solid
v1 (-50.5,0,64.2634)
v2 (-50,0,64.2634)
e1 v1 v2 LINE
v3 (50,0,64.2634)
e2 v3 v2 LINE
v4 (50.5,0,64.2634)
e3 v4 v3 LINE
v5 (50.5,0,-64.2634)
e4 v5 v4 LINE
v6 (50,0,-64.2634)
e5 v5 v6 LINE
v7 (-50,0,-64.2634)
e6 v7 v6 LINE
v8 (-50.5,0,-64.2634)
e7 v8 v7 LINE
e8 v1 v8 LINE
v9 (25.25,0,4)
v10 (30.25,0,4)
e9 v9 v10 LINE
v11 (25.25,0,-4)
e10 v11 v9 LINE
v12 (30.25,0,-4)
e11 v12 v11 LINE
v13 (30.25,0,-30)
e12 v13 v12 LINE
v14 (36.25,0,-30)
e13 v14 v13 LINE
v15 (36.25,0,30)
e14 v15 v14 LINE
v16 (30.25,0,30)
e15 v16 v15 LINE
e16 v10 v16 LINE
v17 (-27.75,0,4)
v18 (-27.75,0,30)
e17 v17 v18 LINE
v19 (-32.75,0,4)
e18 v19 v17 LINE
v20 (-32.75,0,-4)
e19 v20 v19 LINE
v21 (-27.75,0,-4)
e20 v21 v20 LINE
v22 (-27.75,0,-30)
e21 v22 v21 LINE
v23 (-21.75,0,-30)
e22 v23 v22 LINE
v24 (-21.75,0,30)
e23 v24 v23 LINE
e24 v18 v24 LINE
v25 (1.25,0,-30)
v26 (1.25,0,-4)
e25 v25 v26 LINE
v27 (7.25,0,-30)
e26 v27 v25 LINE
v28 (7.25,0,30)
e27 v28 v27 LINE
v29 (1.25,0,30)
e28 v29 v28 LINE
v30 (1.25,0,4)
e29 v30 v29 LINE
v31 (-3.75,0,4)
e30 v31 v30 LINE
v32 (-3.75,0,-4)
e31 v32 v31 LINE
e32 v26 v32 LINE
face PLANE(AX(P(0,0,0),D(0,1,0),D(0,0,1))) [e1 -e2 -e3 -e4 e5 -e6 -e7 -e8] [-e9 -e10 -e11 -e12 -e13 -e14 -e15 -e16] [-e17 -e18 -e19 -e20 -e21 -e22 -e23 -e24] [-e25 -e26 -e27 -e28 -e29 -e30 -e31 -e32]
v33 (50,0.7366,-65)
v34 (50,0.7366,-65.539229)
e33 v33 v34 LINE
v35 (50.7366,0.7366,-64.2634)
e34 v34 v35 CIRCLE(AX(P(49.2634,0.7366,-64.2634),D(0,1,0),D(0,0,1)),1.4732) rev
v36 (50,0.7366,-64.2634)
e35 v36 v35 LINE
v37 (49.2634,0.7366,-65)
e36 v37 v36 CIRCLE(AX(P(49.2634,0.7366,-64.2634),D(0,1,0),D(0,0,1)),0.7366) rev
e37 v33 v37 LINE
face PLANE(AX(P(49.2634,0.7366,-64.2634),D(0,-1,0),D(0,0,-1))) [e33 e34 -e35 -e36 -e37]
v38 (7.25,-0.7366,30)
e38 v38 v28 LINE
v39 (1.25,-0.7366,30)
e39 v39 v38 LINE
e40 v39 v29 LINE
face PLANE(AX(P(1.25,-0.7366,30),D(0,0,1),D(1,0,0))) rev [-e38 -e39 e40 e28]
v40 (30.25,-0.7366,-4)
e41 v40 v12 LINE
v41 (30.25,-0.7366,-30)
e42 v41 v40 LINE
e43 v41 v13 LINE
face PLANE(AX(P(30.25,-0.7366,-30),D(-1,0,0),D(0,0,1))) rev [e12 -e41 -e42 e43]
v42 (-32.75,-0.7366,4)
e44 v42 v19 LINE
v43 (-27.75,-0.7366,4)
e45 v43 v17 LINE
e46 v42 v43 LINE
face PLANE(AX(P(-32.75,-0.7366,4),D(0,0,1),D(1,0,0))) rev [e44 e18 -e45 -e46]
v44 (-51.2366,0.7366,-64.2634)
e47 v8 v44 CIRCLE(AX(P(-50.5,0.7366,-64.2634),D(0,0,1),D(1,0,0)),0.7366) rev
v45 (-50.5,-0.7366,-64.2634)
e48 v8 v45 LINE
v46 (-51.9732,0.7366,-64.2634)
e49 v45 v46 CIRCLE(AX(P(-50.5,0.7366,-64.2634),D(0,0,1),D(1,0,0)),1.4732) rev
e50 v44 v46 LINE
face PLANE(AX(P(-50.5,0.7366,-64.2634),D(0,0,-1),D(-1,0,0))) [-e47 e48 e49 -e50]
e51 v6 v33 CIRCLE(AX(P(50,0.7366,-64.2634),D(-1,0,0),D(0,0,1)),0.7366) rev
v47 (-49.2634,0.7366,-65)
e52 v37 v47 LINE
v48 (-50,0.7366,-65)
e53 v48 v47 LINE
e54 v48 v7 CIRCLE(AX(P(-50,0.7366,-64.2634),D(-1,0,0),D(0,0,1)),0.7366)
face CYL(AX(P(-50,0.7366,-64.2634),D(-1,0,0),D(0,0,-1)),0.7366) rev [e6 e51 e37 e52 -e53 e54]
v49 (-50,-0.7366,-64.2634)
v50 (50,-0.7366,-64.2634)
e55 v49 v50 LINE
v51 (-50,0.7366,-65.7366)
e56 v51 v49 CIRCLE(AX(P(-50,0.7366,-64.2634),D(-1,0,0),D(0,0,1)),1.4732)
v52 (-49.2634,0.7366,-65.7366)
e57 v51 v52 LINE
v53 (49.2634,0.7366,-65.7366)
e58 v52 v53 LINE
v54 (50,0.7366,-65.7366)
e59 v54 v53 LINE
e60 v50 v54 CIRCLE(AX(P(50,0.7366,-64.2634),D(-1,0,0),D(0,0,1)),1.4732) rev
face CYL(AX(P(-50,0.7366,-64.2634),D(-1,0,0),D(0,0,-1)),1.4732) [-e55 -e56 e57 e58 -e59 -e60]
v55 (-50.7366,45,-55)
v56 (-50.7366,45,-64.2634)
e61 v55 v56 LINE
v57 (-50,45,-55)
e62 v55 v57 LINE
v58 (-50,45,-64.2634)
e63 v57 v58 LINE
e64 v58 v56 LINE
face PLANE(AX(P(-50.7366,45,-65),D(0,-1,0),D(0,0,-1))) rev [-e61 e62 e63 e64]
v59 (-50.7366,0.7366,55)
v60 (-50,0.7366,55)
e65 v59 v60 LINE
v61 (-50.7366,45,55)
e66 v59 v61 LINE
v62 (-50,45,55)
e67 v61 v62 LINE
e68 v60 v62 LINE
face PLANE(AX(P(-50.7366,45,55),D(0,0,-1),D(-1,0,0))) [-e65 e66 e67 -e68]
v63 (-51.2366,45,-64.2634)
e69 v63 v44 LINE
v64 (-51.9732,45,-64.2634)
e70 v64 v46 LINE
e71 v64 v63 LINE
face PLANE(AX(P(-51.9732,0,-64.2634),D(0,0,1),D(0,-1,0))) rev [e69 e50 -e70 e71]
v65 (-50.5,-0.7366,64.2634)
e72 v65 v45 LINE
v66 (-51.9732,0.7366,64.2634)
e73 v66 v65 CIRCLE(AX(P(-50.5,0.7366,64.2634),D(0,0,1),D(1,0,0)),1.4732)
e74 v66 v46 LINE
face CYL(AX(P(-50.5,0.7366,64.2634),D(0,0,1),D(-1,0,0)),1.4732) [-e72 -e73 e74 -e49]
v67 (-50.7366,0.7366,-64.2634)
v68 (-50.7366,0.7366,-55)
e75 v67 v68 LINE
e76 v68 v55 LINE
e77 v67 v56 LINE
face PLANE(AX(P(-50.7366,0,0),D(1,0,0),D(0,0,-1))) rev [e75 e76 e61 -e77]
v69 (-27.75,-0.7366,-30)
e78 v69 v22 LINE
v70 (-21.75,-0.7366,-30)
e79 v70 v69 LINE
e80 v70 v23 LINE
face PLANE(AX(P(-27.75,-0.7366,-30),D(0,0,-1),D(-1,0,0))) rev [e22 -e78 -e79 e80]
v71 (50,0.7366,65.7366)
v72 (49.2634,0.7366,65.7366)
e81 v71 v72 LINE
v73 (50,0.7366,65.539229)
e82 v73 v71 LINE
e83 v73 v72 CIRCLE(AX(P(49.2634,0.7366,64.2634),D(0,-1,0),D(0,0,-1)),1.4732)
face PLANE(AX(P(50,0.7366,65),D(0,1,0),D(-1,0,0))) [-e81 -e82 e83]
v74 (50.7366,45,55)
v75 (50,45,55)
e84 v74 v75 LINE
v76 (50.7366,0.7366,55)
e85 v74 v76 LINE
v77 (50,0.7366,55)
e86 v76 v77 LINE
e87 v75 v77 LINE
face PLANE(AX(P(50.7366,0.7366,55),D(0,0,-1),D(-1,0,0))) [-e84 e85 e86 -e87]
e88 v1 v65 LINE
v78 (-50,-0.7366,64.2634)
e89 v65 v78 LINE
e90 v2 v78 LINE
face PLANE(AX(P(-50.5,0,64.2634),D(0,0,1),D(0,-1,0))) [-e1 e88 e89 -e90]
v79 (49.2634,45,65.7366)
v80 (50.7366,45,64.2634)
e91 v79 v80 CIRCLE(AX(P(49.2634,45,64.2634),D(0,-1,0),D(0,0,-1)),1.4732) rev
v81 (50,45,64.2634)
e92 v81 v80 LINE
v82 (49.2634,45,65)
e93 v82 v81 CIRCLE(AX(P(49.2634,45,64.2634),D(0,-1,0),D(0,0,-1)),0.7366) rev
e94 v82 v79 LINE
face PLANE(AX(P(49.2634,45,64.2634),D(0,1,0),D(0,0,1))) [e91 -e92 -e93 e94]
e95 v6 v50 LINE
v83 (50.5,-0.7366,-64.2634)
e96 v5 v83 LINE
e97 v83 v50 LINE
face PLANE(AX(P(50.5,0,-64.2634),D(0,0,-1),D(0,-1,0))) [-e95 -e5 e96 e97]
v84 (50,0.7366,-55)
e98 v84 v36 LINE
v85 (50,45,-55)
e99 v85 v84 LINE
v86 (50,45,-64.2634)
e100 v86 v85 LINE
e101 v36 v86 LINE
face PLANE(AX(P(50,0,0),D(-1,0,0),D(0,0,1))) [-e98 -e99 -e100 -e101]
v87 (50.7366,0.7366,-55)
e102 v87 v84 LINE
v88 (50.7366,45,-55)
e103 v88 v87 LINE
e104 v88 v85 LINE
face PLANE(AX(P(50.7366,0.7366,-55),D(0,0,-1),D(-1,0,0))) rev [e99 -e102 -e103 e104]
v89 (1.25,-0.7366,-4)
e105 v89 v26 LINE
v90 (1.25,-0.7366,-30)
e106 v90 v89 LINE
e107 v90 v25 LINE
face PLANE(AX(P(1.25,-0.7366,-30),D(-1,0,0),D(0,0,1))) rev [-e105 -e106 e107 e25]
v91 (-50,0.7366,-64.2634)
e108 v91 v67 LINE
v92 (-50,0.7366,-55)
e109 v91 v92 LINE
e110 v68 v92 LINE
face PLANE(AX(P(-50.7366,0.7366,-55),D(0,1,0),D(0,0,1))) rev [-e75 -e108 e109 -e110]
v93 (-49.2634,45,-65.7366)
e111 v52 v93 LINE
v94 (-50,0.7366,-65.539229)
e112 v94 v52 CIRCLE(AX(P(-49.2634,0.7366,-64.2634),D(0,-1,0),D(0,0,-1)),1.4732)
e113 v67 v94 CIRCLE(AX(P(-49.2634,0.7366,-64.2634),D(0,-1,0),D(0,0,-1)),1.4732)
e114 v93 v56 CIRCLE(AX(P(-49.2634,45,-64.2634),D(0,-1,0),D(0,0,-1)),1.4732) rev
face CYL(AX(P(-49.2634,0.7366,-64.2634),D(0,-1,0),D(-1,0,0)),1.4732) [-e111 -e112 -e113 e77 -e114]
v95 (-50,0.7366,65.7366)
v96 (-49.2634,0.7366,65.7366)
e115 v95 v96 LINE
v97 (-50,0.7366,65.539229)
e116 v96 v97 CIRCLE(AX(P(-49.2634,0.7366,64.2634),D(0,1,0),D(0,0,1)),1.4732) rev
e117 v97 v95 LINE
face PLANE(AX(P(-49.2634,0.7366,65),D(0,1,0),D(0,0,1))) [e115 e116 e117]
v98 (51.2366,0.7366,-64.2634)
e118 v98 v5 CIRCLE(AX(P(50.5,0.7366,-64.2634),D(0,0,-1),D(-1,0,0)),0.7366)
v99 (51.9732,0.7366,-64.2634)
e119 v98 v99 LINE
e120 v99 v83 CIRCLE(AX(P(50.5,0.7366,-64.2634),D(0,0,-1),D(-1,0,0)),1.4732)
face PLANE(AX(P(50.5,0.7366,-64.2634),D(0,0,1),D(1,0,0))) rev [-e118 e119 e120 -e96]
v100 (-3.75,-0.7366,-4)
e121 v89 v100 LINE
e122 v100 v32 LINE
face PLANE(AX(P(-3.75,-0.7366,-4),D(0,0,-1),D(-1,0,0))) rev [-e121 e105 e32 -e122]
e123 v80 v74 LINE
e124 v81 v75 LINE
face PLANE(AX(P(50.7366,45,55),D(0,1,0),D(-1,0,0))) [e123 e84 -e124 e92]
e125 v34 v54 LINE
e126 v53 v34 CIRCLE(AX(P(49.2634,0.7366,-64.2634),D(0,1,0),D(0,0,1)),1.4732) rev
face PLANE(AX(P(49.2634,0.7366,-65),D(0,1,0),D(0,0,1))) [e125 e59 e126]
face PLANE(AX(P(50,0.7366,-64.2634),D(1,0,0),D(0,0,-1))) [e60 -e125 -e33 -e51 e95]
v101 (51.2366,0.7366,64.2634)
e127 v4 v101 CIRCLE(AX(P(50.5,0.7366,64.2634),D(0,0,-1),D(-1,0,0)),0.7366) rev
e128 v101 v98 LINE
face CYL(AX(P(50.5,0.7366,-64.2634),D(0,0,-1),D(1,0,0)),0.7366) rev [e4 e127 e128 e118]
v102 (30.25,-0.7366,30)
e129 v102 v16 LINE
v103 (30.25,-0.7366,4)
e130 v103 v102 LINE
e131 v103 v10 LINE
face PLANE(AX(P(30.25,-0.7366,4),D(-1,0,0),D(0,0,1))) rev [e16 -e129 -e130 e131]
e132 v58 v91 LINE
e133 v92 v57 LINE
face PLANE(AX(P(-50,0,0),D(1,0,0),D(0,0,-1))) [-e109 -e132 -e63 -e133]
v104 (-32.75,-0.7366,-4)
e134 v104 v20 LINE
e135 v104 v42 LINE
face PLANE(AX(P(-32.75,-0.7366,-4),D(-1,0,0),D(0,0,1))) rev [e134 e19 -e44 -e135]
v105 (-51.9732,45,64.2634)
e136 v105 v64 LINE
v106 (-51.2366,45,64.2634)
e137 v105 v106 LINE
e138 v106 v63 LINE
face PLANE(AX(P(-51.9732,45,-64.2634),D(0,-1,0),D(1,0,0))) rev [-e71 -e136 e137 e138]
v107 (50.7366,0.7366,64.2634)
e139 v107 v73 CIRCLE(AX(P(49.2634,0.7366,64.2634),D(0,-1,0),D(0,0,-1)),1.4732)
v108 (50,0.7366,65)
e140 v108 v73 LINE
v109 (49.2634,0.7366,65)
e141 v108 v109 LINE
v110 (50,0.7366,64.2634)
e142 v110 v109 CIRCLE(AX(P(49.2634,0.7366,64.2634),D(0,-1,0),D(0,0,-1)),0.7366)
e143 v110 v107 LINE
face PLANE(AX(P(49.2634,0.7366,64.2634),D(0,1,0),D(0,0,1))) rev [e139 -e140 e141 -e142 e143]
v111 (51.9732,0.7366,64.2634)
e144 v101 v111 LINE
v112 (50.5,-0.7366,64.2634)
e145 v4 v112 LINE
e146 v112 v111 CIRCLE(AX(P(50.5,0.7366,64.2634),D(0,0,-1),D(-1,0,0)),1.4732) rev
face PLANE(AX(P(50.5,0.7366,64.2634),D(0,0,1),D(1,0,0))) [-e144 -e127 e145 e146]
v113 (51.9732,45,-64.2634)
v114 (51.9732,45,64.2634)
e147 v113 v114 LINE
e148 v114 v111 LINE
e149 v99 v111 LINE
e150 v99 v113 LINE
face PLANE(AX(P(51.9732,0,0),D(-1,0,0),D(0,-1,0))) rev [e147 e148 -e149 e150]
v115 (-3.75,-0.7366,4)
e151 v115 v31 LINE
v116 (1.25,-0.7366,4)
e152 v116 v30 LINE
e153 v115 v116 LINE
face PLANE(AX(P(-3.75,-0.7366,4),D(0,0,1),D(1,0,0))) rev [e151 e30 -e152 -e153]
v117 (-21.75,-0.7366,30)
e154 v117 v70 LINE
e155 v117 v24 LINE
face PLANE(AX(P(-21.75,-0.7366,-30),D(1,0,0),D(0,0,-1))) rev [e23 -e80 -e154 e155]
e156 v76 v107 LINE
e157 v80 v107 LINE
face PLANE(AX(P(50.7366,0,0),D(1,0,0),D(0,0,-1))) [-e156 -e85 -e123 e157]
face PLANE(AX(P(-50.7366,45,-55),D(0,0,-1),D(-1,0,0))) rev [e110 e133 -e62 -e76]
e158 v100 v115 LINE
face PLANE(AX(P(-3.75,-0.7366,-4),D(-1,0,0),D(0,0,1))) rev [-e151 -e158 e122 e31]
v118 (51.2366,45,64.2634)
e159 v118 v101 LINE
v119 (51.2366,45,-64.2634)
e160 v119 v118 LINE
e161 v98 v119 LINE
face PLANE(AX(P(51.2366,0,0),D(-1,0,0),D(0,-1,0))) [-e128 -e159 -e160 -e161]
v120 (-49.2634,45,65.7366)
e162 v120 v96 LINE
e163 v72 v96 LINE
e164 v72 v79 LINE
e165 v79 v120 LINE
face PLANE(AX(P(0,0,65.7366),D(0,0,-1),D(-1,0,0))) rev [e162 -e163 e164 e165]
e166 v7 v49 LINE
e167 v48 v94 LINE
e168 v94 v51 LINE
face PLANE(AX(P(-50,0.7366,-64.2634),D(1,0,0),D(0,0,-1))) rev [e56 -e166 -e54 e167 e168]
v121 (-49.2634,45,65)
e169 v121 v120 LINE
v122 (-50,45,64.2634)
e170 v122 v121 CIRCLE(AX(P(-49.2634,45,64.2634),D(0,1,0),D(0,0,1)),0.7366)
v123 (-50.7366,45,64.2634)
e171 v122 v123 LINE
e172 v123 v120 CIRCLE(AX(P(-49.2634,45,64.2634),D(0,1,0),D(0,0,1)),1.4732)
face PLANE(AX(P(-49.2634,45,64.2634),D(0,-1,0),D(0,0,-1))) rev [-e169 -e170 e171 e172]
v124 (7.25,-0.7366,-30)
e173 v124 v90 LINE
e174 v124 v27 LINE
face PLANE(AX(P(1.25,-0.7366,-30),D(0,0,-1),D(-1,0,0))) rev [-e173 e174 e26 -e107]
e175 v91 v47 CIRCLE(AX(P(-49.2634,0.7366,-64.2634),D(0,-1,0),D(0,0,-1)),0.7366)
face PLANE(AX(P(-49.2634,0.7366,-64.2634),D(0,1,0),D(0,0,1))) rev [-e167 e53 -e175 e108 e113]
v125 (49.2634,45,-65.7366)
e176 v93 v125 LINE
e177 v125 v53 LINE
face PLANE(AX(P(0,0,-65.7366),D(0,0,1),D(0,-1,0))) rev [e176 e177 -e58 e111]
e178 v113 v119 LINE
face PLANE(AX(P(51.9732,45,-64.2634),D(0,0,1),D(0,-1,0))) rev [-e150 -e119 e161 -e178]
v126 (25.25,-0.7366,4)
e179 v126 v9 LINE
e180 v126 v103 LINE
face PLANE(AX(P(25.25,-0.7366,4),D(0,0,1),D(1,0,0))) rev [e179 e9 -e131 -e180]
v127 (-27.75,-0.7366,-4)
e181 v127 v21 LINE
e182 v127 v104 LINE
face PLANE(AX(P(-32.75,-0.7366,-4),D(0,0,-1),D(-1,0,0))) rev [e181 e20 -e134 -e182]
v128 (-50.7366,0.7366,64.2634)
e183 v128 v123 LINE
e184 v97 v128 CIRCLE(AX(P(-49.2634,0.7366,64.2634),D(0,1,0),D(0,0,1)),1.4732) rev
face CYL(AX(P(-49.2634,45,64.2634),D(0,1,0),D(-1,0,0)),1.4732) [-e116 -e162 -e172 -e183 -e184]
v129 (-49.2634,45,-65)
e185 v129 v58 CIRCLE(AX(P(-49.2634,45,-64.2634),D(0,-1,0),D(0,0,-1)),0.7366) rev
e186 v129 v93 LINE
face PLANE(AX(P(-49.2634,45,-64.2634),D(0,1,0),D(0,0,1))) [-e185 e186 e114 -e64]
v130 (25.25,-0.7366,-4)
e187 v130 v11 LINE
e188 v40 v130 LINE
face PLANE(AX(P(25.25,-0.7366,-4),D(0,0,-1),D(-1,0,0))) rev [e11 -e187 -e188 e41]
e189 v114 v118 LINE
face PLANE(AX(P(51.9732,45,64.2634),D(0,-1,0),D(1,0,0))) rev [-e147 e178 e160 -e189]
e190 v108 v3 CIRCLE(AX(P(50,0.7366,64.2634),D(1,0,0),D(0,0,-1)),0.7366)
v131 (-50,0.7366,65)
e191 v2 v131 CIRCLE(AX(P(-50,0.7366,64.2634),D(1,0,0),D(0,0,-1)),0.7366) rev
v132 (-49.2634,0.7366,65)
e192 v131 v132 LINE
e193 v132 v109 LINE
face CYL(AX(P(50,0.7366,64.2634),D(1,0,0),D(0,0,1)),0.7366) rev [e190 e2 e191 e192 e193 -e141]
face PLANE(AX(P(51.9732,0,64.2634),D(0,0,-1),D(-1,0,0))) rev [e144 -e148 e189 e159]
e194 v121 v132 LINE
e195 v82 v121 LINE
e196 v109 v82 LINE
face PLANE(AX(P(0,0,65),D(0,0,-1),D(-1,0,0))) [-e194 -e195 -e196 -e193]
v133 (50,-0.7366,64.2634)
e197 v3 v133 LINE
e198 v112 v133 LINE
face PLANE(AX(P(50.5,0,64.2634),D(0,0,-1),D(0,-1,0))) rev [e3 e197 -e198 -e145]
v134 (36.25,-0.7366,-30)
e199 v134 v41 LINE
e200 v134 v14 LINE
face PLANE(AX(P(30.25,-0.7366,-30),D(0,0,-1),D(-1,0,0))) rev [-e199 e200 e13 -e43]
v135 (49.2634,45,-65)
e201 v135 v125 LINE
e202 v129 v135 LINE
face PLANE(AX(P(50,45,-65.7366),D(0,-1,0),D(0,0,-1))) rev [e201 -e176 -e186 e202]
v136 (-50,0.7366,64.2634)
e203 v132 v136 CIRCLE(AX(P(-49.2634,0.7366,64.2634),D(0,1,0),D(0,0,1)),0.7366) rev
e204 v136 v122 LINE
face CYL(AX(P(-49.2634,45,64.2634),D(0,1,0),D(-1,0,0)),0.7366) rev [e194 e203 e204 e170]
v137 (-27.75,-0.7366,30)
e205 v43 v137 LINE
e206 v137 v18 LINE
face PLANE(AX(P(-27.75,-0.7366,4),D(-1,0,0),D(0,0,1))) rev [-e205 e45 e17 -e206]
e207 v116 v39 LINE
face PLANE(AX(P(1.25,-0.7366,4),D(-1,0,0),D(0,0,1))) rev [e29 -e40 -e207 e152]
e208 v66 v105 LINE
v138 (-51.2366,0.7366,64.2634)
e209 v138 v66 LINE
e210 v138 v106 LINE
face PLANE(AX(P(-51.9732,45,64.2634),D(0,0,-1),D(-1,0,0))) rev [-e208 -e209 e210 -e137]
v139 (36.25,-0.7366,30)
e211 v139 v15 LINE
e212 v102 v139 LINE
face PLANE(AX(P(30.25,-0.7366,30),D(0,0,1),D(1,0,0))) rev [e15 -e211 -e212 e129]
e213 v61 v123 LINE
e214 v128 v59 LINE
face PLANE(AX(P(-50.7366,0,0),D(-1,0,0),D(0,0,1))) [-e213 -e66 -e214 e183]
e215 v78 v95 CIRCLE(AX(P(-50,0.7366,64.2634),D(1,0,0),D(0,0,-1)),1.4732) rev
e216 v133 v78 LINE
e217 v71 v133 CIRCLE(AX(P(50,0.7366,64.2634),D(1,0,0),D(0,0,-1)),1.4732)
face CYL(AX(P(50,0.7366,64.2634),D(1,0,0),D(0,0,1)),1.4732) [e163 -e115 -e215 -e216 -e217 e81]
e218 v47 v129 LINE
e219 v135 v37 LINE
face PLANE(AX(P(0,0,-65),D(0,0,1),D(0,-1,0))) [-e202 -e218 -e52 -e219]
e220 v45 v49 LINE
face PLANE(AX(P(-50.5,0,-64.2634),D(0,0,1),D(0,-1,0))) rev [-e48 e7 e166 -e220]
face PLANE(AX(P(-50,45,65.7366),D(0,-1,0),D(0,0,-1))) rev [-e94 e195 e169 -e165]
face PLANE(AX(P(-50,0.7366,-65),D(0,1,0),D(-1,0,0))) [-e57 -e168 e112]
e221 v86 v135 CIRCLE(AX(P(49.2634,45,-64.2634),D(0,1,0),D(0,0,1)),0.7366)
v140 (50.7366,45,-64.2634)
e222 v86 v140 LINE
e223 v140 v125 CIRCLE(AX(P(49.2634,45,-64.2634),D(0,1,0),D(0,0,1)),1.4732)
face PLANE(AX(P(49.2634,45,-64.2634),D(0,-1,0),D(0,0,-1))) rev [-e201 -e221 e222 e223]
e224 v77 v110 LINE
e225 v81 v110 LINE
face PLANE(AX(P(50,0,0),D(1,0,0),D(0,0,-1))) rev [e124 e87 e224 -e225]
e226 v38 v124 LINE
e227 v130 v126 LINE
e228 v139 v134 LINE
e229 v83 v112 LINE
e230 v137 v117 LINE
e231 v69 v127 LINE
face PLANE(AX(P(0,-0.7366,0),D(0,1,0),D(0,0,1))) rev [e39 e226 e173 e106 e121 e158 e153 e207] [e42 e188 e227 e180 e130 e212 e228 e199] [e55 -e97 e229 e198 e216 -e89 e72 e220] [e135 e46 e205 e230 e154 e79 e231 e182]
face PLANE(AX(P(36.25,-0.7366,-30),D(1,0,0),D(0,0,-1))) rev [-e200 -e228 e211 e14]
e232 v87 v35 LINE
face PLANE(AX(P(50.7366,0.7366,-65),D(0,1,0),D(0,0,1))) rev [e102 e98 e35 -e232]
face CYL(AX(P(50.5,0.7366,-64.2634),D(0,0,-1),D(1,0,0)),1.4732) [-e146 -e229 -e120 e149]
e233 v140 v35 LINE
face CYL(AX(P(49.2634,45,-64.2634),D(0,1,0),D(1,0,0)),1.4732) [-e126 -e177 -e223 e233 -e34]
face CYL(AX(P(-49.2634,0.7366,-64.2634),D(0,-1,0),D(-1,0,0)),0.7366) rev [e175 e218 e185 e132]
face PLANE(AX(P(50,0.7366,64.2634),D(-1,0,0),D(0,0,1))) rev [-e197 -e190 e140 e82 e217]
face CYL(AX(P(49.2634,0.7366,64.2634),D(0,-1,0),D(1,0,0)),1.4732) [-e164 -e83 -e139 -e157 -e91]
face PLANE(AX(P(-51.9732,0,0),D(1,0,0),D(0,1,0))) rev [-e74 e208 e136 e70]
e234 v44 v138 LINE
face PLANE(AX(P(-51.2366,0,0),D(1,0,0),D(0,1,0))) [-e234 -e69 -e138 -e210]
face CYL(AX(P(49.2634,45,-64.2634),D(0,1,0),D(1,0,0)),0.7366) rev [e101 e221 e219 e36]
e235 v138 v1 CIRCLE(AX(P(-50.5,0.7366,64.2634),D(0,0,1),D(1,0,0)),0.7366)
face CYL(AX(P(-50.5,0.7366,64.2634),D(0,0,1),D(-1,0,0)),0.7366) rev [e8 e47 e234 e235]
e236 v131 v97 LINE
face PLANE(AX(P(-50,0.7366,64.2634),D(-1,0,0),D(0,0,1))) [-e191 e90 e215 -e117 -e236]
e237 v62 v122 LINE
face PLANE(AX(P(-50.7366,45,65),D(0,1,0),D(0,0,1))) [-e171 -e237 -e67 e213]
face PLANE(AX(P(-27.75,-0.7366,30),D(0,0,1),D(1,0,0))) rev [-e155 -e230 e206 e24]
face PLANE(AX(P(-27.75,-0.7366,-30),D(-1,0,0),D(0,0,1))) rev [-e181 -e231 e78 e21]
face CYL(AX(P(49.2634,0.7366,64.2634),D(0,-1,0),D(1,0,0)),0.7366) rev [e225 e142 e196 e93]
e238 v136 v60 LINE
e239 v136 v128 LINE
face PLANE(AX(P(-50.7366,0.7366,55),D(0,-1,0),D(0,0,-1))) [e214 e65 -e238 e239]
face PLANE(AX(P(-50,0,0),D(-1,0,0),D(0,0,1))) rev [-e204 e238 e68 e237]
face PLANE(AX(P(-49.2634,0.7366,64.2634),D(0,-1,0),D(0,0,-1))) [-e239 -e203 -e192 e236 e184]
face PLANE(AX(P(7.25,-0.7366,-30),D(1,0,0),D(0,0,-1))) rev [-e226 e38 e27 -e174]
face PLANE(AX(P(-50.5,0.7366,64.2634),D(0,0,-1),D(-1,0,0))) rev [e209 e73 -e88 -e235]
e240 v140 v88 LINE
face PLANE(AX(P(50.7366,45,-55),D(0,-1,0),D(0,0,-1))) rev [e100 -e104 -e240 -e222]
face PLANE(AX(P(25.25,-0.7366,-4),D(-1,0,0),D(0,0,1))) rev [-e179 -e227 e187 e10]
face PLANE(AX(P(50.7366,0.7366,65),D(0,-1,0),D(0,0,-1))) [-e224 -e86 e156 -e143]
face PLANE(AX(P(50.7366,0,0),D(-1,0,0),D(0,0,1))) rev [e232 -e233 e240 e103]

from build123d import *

# Parameters (mm, degrees)
SKETCH1_W                        = 100
SKETCH1_H                        = 130
BASE_FLANGE1_DEPTH               = 0.7366
BOX_REAR_STRIP_W                 = 4.4196
BOX_REAR_STRIP_H                 = 0.7366
BOX_REAR_STRIP_CUT_DEPTH         = 100
BOX_REAR_DEPTH                   = 100
BOX_FRONT_STRIP_W                = 4.4196
BOX_FRONT_STRIP_H                = 0.7366
BOX_FRONT_STRIP_CUT_DEPTH        = 100
BOX_FRONT_DEPTH                  = 100
BOX_FRONT_TABS_STRIP_W           = 4.4196
BOX_FRONT_TABS_STRIP_H           = 0.7366
BOX_FRONT_TABS_STRIP_CUT_DEPTH   = 44.2634
BOX_FRONT_TABS_STRIP_2_W         = 4.4196
BOX_FRONT_TABS_STRIP_2_H         = 0.7366
BOX_FRONT_TABS_STRIP_CUT_2_DEPTH = 44.2634
BOX_FRONT_TABS_DEPTH             = 44.2634
BOX_FRONT_TABS_BEND_DEPTH        = 44.2634
BOX_REAR_TABS_STRIP_W            = 4.4196
BOX_REAR_TABS_STRIP_H            = 0.7366
BOX_REAR_TABS_STRIP_CUT_DEPTH    = 44.2634
BOX_REAR_TABS_STRIP_2_W          = 4.4196
BOX_REAR_TABS_STRIP_2_H          = 0.7366
BOX_REAR_TABS_STRIP_CUT_2_DEPTH  = 44.2634
BOX_REAR_TABS_DEPTH              = 44.2634
BOX_REAR_TABS_BEND_DEPTH         = 44.2634
EDGE_FLANGE6_DEPTH               = 128.5268
EDGE_FLANGE6_START               = 0.7366
EDGE_FLANGE6_FLAT_DEPTH          = 0.7366
EDGE_FLANGE6_BEND_DEPTH          = 128.5268
EDGE_FLANGE6_FLAT_2_DEPTH        = 0.7366


# Sheet-metal steps are written as plain solids
with BuildPart() as part:
    # Sketch1 → Base-Flange1 (new body)
    with BuildSketch(Plane(origin=(0, 0, 0), x_dir=(1, 0, 0), z_dir=(0, 1, 0))):
        Rectangle(SKETCH1_W, SKETCH1_H)
        Polygon((1.25, 30), (7.25, 30), (7.25, -30), (1.25, -30), (1.25, -4), (-3.75, -4), (-3.75, 4), (1.25, 4), align=None, mode=Mode.SUBTRACT)
        Polygon((30.25, 30), (36.25, 30), (36.25, -30), (30.25, -30), (30.25, -4), (25.25, -4), (25.25, 4), (30.25, 4), align=None, mode=Mode.SUBTRACT)
        Polygon((-27.75, 30), (-21.75, 30), (-21.75, -30), (-27.75, -30), (-27.75, -4), (-32.75, -4), (-32.75, 4), (-27.75, 4), align=None, mode=Mode.SUBTRACT)
    extrude(amount=-BASE_FLANGE1_DEPTH)

    # Box rear strip (across the edge) → Box rear strip cut (cut)
    with BuildSketch(Plane(origin=(50, 0, -65), x_dir=(0, 0, 1), z_dir=(-1, 0, 0))):
        with Locations((-1.4732, -0.3683)):
            Rectangle(BOX_REAR_STRIP_W, BOX_REAR_STRIP_H)
    extrude(amount=BOX_REAR_STRIP_CUT_DEPTH, mode=Mode.SUBTRACT)

    # Box rear section (across the edge) → Box rear (add)
    with BuildSketch(Plane(origin=(50, 0, -65), x_dir=(0, 0, 1), z_dir=(-1, 0, 0))):
        with BuildLine():
            Line((-0.7366, 0.7366), (-0.7366, 45))
            Line((-0.7366, 45), (0, 45))
            Line((0, 45), (0, 0.7366))
            ThreePointArc((0, 0.7366), (0.215745145, 0.215745145), (0.7366, 0))
            Line((0.7366, 0), (0.7366, -0.7366))
            ThreePointArc((0.7366, -0.7366), (-0.30510971, -0.30510971), (-0.7366, 0.7366))
        make_face()
    extrude(amount=BOX_REAR_DEPTH)

    # Box front strip (across the edge) → Box front strip cut (cut)
    with BuildSketch(Plane(origin=(-50, 0, 65), x_dir=(0, 0, -1), z_dir=(1, 0, 0))):
        with Locations((-1.4732, -0.3683)):
            Rectangle(BOX_FRONT_STRIP_W, BOX_FRONT_STRIP_H)
    extrude(amount=BOX_FRONT_STRIP_CUT_DEPTH, mode=Mode.SUBTRACT)

    # Box front section (across the edge) → Box front (add)
    with BuildSketch(Plane(origin=(-50, 0, 65), x_dir=(0, 0, -1), z_dir=(1, 0, 0))):
        with BuildLine():
            Line((-0.7366, 0.7366), (-0.7366, 45))
            Line((-0.7366, 45), (0, 45))
            Line((0, 45), (0, 0.7366))
            ThreePointArc((0, 0.7366), (0.215745145, 0.215745145), (0.7366, 0))
            Line((0.7366, 0), (0.7366, -0.7366))
            ThreePointArc((0.7366, -0.7366), (-0.30510971, -0.30510971), (-0.7366, 0.7366))
        make_face()
    extrude(amount=BOX_FRONT_DEPTH)

    # Box-front tabs strip (across the edge) → Box-front tabs strip cut (cut)
    with BuildSketch(Plane(origin=(-50, 0.7366, 65), x_dir=(1, 0, 0), z_dir=(0, 1, 0))):
        with Locations((-1.4732, -0.3683)):
            Rectangle(BOX_FRONT_TABS_STRIP_W, BOX_FRONT_TABS_STRIP_H)
    extrude(amount=BOX_FRONT_TABS_STRIP_CUT_DEPTH, mode=Mode.SUBTRACT)

    # Box-front tabs strip 2 (across the edge) → Box-front tabs strip cut 2 (cut)
    with BuildSketch(Plane(origin=(50, 45, 65), x_dir=(-1, 0, 0), z_dir=(0, -1, 0))):
        with Locations((-1.4732, -0.3683)):
            Rectangle(BOX_FRONT_TABS_STRIP_2_W, BOX_FRONT_TABS_STRIP_2_H)
    extrude(amount=BOX_FRONT_TABS_STRIP_CUT_2_DEPTH, mode=Mode.SUBTRACT)

    # Box-front tabs section (across the edge) → Box-front tabs (add)
    with BuildSketch(Plane(origin=(-50, 0.7366, 65), x_dir=(1, 0, 0), z_dir=(0, 1, 0))):
        with BuildLine():
            Line((-0.7366, 0.7366), (-0.7366, 10))
            Line((-0.7366, 10), (0, 10))
            Line((0, 10), (0, 0.7366))
            ThreePointArc((0, 0.7366), (0.215745145, 0.215745145), (0.7366, 0))
            Line((0.7366, 0), (0.7366, -0.7366))
            ThreePointArc((0.7366, -0.7366), (-0.30510971, -0.30510971), (-0.7366, 0.7366))
        make_face()
    extrude(amount=BOX_FRONT_TABS_DEPTH)

    # Box-front tabs section 2 (across the edge) → Box-front tabs bend (add)
    with BuildSketch(Plane(origin=(50, 45, 65), x_dir=(-1, 0, 0), z_dir=(0, -1, 0))):
        with BuildLine():
            Line((-0.7366, 0.7366), (-0.7366, 10))
            Line((-0.7366, 10), (0, 10))
            Line((0, 10), (0, 0.7366))
            ThreePointArc((0, 0.7366), (0.215745145, 0.215745145), (0.7366, 0))
            Line((0.7366, 0), (0.7366, -0.7366))
            ThreePointArc((0.7366, -0.7366), (-0.30510971, -0.30510971), (-0.7366, 0.7366))
        make_face()
    extrude(amount=BOX_FRONT_TABS_BEND_DEPTH)

    # Box-rear tabs strip (across the edge) → Box-rear tabs strip cut (cut)
    with BuildSketch(Plane(origin=(50, 0.7366, -65), x_dir=(-1, 0, 0), z_dir=(0, 1, 0))):
        with Locations((-1.4732, -0.3683)):
            Rectangle(BOX_REAR_TABS_STRIP_W, BOX_REAR_TABS_STRIP_H)
    extrude(amount=BOX_REAR_TABS_STRIP_CUT_DEPTH, mode=Mode.SUBTRACT)

    # Box-rear tabs strip 2 (across the edge) → Box-rear tabs strip cut 2 (cut)
    with BuildSketch(Plane(origin=(-50, 45, -65), x_dir=(1, 0, 0), z_dir=(0, -1, 0))):
        with Locations((-1.4732, -0.3683)):
            Rectangle(BOX_REAR_TABS_STRIP_2_W, BOX_REAR_TABS_STRIP_2_H)
    extrude(amount=BOX_REAR_TABS_STRIP_CUT_2_DEPTH, mode=Mode.SUBTRACT)

    # Box-rear tabs section (across the edge) → Box-rear tabs (add)
    with BuildSketch(Plane(origin=(50, 0.7366, -65), x_dir=(-1, 0, 0), z_dir=(0, 1, 0))):
        with BuildLine():
            Line((-0.7366, 0.7366), (-0.7366, 10))
            Line((-0.7366, 10), (0, 10))
            Line((0, 10), (0, 0.7366))
            ThreePointArc((0, 0.7366), (0.215745145, 0.215745145), (0.7366, 0))
            Line((0.7366, 0), (0.7366, -0.7366))
            ThreePointArc((0.7366, -0.7366), (-0.30510971, -0.30510971), (-0.7366, 0.7366))
        make_face()
    extrude(amount=BOX_REAR_TABS_DEPTH)

    # Box-rear tabs section 2 (across the edge) → Box-rear tabs bend (add)
    with BuildSketch(Plane(origin=(-50, 45, -65), x_dir=(1, 0, 0), z_dir=(0, -1, 0))):
        with BuildLine():
            Line((-0.7366, 0.7366), (-0.7366, 10))
            Line((-0.7366, 10), (0, 10))
            Line((0, 10), (0, 0.7366))
            ThreePointArc((0, 0.7366), (0.215745145, 0.215745145), (0.7366, 0))
            Line((0.7366, 0), (0.7366, -0.7366))
            ThreePointArc((0.7366, -0.7366), (-0.30510971, -0.30510971), (-0.7366, 0.7366))
        make_face()
    extrude(amount=BOX_REAR_TABS_BEND_DEPTH)

    # Edge-Flange6 bend section (across the edge) → Edge-Flange6 (add)
    with BuildSketch(Plane(origin=(-51.2366, 0, -64.2634), x_dir=(1, 0, 0), z_dir=(0, 0, 1))):
        with BuildLine():
            Line((-0.7366, 0.7366), (0, 0.7366))
            ThreePointArc((0, 0.7366), (0.215745145, 0.215745145), (0.7366, 0))
            Line((0.7366, 0), (1.2366, 0))
            Line((1.2366, 0), (1.2366, -0.7366))
            Line((1.2366, -0.7366), (0.7366, -0.7366))
            ThreePointArc((0.7366, -0.7366), (-0.30510971, -0.30510971), (-0.7366, 0.7366))
        make_face()
    extrude(amount=EDGE_FLANGE6_DEPTH)

    # Edge-Flange6 profile (on flange) → Edge-Flange6 flat (add)
    with BuildSketch(Plane.ZY.offset(51.2366).offset(EDGE_FLANGE6_START)):
        Polygon((-64.2634, 45), (-64.2634, 0.7366), (64.2634, 0.7366), (64.2634, 45), (-2.12, 45), align=None)
    extrude(amount=-EDGE_FLANGE6_FLAT_DEPTH)

    # Edge-Flange6 bend section 2 (across the edge) → Edge-Flange6 bend (add)
    with BuildSketch(Plane(origin=(51.2366, 0, 64.2634), x_dir=(-1, 0, 0), z_dir=(0, 0, -1))):
        with BuildLine():
            Line((-0.7366, 0.7366), (0, 0.7366))
            ThreePointArc((0, 0.7366), (0.215745145, 0.215745145), (0.7366, 0))
            Line((0.7366, 0), (1.2366, 0))
            Line((1.2366, 0), (1.2366, -0.7366))
            Line((1.2366, -0.7366), (0.7366, -0.7366))
            ThreePointArc((0.7366, -0.7366), (-0.30510971, -0.30510971), (-0.7366, 0.7366))
        make_face()
    extrude(amount=EDGE_FLANGE6_BEND_DEPTH)

    # Edge-Flange6 profile 2 (on flange) → Edge-Flange6 flat 2 (add)
    with BuildSketch(Plane(origin=(51.2366, 0, 0), x_dir=(0, 0, -1), z_dir=(1, 0, 0)).offset(EDGE_FLANGE6_START)):
        Polygon((-64.2634, 45), (-64.2634, 0.7366), (64.2634, 0.7366), (64.2634, 45), (-2.12, 45), align=None)
    extrude(amount=-EDGE_FLANGE6_FLAT_2_DEPTH)


solid = part.part
